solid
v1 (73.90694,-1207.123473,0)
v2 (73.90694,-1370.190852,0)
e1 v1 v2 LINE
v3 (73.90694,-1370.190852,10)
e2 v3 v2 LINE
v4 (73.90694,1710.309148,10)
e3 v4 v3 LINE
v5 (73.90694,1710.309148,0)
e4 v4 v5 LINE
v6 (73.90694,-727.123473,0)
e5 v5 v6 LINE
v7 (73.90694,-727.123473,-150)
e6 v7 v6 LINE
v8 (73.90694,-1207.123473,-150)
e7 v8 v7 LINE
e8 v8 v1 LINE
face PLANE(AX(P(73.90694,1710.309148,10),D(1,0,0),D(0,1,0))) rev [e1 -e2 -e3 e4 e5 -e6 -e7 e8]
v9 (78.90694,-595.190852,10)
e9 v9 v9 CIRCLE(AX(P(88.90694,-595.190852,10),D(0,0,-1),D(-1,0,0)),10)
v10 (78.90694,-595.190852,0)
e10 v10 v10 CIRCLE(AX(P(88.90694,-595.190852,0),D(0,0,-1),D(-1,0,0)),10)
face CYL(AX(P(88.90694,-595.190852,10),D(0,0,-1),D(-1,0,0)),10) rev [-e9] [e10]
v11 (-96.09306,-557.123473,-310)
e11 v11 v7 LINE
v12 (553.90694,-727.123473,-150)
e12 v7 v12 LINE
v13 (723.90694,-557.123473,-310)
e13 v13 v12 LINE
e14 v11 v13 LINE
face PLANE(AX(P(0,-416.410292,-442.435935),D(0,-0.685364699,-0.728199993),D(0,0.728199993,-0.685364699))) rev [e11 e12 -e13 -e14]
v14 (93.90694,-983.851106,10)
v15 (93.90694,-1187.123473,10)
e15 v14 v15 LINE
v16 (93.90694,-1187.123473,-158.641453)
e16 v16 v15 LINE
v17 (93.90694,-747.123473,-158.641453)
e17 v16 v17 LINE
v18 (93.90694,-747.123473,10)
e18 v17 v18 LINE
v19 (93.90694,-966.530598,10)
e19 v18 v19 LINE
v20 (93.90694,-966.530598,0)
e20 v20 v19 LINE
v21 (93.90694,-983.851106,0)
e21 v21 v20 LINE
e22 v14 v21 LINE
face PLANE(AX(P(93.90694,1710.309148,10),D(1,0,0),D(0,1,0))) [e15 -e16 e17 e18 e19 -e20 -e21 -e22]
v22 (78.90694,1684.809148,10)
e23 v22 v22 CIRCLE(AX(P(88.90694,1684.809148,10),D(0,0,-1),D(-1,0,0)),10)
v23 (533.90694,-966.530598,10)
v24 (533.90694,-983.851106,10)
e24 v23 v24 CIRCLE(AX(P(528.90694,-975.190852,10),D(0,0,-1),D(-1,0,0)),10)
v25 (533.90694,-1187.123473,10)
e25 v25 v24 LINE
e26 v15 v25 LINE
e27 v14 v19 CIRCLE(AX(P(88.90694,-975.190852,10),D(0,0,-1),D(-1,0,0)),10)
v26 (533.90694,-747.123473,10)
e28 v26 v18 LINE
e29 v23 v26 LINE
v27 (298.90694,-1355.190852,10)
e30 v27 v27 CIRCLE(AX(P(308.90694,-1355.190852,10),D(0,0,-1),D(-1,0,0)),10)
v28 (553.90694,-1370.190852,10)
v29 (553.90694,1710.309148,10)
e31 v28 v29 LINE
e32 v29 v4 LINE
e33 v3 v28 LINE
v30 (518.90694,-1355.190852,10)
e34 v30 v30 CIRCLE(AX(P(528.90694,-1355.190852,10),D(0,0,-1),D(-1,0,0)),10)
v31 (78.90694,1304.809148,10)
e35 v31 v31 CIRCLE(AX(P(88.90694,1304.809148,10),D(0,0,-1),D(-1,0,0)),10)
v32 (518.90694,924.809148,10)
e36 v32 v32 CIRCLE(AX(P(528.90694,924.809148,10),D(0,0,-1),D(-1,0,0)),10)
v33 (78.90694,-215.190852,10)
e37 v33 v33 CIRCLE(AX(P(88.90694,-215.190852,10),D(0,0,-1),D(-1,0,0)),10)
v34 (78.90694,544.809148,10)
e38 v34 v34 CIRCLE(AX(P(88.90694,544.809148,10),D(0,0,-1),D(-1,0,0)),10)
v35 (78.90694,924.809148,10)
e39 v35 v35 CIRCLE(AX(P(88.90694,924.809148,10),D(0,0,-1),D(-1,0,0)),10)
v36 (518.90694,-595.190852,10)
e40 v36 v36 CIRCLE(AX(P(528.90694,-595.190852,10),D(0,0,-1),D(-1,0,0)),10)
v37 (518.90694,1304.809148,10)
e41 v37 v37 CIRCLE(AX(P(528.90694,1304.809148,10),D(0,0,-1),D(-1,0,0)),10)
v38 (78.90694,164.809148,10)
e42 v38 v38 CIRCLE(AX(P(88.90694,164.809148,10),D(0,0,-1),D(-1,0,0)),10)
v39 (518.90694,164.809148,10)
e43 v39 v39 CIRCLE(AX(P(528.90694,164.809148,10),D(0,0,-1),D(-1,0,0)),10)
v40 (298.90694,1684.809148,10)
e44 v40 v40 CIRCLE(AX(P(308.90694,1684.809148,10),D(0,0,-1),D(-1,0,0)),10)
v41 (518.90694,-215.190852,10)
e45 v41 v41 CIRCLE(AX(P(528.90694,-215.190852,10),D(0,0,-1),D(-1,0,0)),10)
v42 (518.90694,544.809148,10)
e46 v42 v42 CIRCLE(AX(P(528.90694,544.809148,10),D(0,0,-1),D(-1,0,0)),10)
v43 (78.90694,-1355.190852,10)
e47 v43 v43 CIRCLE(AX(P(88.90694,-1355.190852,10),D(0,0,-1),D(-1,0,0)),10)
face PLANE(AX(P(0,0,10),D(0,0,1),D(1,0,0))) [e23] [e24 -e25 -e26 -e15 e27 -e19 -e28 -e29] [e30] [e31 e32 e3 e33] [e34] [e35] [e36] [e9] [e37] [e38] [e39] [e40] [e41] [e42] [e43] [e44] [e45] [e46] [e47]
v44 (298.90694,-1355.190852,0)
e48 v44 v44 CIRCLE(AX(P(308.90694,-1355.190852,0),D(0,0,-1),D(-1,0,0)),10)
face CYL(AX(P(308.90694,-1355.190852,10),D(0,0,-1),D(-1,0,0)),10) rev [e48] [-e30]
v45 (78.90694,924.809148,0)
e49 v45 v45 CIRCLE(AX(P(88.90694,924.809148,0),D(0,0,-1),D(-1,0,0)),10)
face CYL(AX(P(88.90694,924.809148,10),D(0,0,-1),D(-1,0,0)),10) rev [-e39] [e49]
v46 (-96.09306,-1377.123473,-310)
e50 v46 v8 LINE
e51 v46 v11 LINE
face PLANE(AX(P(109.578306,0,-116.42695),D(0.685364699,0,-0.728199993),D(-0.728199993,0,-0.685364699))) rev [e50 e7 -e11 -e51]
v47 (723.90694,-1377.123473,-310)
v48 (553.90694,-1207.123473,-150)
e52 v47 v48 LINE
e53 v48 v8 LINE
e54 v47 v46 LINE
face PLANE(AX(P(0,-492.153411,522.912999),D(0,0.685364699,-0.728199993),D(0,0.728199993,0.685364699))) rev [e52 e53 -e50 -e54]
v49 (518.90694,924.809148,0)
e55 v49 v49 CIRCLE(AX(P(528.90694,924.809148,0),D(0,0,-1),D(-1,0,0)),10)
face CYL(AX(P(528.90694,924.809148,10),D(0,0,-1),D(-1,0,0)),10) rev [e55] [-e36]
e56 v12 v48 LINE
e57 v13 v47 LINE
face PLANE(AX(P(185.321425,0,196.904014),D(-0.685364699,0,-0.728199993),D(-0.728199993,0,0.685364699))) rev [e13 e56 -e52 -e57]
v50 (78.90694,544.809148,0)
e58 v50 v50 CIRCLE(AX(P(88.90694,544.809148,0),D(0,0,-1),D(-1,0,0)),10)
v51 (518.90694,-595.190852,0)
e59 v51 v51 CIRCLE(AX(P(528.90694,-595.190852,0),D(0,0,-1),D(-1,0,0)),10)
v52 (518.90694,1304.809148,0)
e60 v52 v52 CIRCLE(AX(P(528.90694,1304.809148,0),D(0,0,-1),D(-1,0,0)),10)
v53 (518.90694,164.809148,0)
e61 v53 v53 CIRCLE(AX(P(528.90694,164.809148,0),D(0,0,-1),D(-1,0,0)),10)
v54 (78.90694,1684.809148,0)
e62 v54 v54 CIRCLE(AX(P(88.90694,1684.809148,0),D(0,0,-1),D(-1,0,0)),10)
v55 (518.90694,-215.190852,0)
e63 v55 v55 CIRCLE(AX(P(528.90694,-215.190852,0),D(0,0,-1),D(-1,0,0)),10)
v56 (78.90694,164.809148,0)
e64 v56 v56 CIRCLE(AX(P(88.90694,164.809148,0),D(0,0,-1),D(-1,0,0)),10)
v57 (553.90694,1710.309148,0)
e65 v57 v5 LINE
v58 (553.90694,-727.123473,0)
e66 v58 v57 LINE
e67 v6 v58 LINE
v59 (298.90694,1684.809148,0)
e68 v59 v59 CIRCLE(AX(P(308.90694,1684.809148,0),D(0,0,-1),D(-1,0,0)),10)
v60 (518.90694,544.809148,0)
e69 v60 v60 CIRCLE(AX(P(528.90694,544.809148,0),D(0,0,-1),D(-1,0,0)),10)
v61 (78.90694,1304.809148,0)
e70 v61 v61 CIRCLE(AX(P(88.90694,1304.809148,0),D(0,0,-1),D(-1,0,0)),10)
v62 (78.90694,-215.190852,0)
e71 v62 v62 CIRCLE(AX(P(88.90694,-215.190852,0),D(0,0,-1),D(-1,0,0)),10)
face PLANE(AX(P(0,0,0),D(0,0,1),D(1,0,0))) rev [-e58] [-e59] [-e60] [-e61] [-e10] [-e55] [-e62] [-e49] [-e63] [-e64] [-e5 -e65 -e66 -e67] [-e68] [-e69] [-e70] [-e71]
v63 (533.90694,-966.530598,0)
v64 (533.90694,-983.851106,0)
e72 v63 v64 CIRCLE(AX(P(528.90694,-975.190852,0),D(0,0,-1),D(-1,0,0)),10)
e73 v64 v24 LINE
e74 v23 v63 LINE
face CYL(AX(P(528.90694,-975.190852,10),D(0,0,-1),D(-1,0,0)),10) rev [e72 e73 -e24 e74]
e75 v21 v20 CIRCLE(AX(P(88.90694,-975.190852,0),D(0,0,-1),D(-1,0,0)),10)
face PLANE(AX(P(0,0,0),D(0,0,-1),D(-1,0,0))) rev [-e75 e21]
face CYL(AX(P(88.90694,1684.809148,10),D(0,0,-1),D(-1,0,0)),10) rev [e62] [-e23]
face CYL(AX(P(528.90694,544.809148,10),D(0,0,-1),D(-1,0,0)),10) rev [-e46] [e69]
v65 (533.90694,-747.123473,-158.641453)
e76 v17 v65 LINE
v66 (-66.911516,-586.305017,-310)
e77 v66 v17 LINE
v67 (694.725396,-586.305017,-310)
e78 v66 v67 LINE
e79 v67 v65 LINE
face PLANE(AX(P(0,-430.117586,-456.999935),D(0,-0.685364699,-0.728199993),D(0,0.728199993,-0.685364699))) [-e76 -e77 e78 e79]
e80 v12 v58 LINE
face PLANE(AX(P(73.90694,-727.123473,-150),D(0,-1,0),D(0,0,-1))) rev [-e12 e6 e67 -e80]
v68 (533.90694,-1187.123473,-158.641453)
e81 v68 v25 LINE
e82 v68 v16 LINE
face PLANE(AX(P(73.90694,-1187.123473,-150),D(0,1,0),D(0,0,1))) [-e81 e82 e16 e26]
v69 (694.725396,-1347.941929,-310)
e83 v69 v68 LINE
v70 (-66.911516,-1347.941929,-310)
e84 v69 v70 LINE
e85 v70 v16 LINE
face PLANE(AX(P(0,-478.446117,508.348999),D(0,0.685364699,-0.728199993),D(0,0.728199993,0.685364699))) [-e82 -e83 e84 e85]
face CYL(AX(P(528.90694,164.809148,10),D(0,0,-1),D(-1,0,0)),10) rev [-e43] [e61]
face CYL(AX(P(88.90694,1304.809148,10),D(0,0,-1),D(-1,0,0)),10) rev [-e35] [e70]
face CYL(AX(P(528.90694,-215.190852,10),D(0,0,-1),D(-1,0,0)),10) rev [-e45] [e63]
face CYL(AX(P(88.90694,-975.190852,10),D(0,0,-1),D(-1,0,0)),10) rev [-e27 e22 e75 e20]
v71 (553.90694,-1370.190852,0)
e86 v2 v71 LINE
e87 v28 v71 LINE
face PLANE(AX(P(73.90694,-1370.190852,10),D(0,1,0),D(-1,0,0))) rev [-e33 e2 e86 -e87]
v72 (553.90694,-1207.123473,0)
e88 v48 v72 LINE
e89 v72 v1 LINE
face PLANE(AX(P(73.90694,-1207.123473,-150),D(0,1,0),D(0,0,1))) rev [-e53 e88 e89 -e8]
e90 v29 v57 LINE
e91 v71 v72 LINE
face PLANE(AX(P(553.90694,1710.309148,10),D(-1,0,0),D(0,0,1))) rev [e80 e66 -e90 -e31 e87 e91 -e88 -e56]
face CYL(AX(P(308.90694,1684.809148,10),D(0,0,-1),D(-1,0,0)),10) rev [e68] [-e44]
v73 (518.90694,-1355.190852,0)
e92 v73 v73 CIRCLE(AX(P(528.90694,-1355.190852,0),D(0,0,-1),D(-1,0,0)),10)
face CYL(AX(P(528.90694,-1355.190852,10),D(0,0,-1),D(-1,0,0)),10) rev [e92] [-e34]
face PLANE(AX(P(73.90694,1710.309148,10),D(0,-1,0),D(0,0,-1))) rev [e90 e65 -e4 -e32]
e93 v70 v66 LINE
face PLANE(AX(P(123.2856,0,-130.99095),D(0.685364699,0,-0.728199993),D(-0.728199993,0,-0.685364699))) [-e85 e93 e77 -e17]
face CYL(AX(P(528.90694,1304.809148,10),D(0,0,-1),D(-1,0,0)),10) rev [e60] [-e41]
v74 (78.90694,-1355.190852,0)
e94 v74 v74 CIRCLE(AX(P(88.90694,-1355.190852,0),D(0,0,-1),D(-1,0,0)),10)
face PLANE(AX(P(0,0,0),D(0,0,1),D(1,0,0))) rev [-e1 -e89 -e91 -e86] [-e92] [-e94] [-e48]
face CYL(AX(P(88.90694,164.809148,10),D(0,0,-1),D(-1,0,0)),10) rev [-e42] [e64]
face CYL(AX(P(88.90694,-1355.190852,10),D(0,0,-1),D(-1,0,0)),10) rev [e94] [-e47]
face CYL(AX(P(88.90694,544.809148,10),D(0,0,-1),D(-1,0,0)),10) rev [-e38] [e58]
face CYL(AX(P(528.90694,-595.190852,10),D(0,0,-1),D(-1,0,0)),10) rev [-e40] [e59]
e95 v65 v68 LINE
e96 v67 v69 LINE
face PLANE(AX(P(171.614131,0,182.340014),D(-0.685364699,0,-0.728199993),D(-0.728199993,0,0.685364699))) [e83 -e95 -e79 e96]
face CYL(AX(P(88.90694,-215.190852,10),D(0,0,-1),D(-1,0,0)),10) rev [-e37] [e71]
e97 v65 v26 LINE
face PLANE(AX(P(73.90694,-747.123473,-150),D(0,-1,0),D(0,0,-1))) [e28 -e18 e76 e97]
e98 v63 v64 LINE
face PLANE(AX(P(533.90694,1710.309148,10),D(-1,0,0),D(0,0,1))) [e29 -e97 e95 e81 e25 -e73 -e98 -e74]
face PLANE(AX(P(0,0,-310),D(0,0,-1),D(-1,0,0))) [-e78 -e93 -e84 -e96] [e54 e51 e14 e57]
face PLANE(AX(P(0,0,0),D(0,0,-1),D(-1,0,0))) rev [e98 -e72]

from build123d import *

# Parameters (mm, degrees)
SKETCH1_W           = 480
SKETCH1_H           = 3080.5
BOSS_EXTRUDE1_DEPTH = 10
SKETCH2_R           = 10
CUT_EXTRUDE1_DEPTH  = 1798.795950849
SKETCH3_W           = 480
SKETCH3_H           = 480
BOSS_EXTRUDE2_DEPTH = 150
SHELL3_START        = -310
SHELL3_DEPTH        = 300
SHELL3_2_DEPTH      = 290
SKETCH7_W           = 440
SKETCH7_H           = 440
CUT_EXTRUDE6_DEPTH  = 1885.56855559


with BuildPart() as part:
    # Sketch1 → Boss-Extrude1 (new body)
    with BuildSketch(Plane.XY):
        with Locations((313.906940063, 170.059148265)):
            Rectangle(SKETCH1_W, SKETCH1_H)
    extrude(amount=BOSS_EXTRUDE1_DEPTH)

    # Sketch2 → Cut-Extrude1 (cut, through all)
    with BuildSketch(Plane(origin=(0, 0, 0), x_dir=(-1, 0, 0), z_dir=(0, 0, -1))):
        with Locations((-88.906940063, 544.809148265)):
            Circle(SKETCH2_R)
        with Locations((-88.906940063, -1355.190851735)):
            Circle(SKETCH2_R)
        with Locations((-88.906940063, 1684.809148265)):
            Circle(SKETCH2_R)
        with Locations((-308.906940063, 1684.809148265)):
            Circle(SKETCH2_R)
        with Locations((-528.906940063, 1304.809148265)):
            Circle(SKETCH2_R)
        with Locations((-88.906940063, 1304.809148265)):
            Circle(SKETCH2_R)
        with Locations((-88.906940063, 924.809148265)):
            Circle(SKETCH2_R)
        with Locations((-528.906940063, 924.809148265)):
            Circle(SKETCH2_R)
        with Locations((-528.906940063, 544.809148265)):
            Circle(SKETCH2_R)
        with Locations((-88.906940063, 164.809148265)):
            Circle(SKETCH2_R)
        with Locations((-528.906940063, 164.809148265)):
            Circle(SKETCH2_R)
        with Locations((-88.906940063, -215.190851735)):
            Circle(SKETCH2_R)
        with Locations((-528.906940063, -215.190851735)):
            Circle(SKETCH2_R)
        with Locations((-88.906940063, -595.190851735)):
            Circle(SKETCH2_R)
        with Locations((-528.906940063, -595.190851735)):
            Circle(SKETCH2_R)
        with Locations((-528.906940063, -975.190851735)):
            Circle(SKETCH2_R)
        with Locations((-88.906940063, -975.190851735)):
            Circle(SKETCH2_R)
        with Locations((-308.906940063, -1355.190851735)):
            Circle(SKETCH2_R)
        with Locations((-528.906940063, -1355.190851735)):
            Circle(SKETCH2_R)
    extrude(amount=-CUT_EXTRUDE1_DEPTH, mode=Mode.SUBTRACT)

    # Sketch3 → Boss-Extrude2 (add)
    with BuildSketch(Plane(origin=(0, 0, 0), x_dir=(-1, 0, 0), z_dir=(0, 0, -1))):
        with Locations((-313.906940063, -967.123472678)):
            Rectangle(SKETCH3_W, SKETCH3_H)
    extrude(amount=BOSS_EXTRUDE2_DEPTH)

    # Sketch5 → Loft1 section 0
    with BuildSketch(Plane(origin=(0, 0, -310), x_dir=(-1, 0, 0), z_dir=(0, 0, -1))):
        with BuildLine():
            Line((-723.906940063, -1377.123472678), (96.093059937, -1377.123472678))
            Line((96.093059937, -1377.123472678), (96.093059937, -557.123472678))
            Line((96.093059937, -557.123472678), (-723.906940063, -557.123472678))
            Line((-723.906940063, -557.123472678), (-723.906940063, -1377.123472678))
        make_face()
    # Sketch4 → Loft1 section 1
    with BuildSketch(Plane(origin=(0, 0, -150), x_dir=(-1, 0, 0), z_dir=(0, 0, -1))):
        with BuildLine():
            Line((-553.906940063, -1207.123472678), (-73.906940063, -1207.123472678))
            Line((-73.906940063, -1207.123472678), (-73.906940063, -727.123472678))
            Line((-73.906940063, -727.123472678), (-553.906940063, -727.123472678))
            Line((-553.906940063, -727.123472678), (-553.906940063, -1207.123472678))
        make_face()
    loft()

    # Shell3: read off the stored shape, not the designer's step
    # Shell3 outline → Shell3 (cut)
    with BuildSketch(Plane.XY.offset(SHELL3_START)):
        with BuildLine():
            Line((93.906940063, -1004.771250651), (93.906940063, -1187.123472678))
            Line((93.906940063, -1187.123472678), (533.906940063, -1187.123472678))
            Line((533.906940063, -1187.123472678), (533.906940063, -1004.771250651))
            ThreePointArc((533.906940063, -1004.771250651), (498.906940063, -975.190851736), (533.906940063, -945.61045282))
            Line((533.906940063, -945.61045282), (533.906940063, -747.123472678))
            Line((533.906940063, -747.123472678), (93.906940063, -747.123472678))
            Line((93.906940063, -747.123472678), (93.906940063, -945.61045282))
            ThreePointArc((93.906940063, -945.61045282), (118.906940063, -975.190851736), (93.906940063, -1004.771250651))
        make_face()
    extrude(amount=SHELL3_DEPTH, mode=Mode.SUBTRACT)

    # Shell3 2 outline → Shell3 2 (cut)
    with BuildSketch(Plane.XY.offset(SHELL3_START)):
        with BuildLine():
            Line((93.906940063, -945.61045282), (93.906940063, -1004.771250651))
            ThreePointArc((93.906940063, -1004.771250651), (118.906940063, -975.190851736), (93.906940063, -945.61045282))
        make_face()
        with BuildLine():
            ThreePointArc((533.906940063, -945.61045282), (498.906940063, -975.190851736), (533.906940063, -1004.771250651))
            Line((533.906940063, -1004.771250651), (533.906940063, -945.61045282))
        make_face()
    extrude(amount=SHELL3_2_DEPTH, mode=Mode.SUBTRACT)

    # Shell3 3: loft between two sections, ruled curve by curve
    shell3_3_from = [
        Edge.make_line((533.906940063, -1187.123472678, -158.641453012), (93.906940063, -1187.123472678, -158.641453012)),
        Edge.make_line((93.906940063, -1187.123472678, -158.641453012), (93.906940063, -747.123472678, -158.641453012)),
        Edge.make_line((533.906940063, -747.123472678, -158.641453012), (533.906940063, -1187.123472678, -158.641453012)),
        Edge.make_line((93.906940063, -747.123472678, -158.641453012), (533.906940063, -747.123472678, -158.641453012)),
    ]
    shell3_3_to = [
        Edge.make_line((694.725396238, -1347.941928853, -310), (-66.911516112, -1347.941928853, -310)),
        Edge.make_line((-66.911516112, -1347.941928853, -310), (-66.911516112, -586.305016503, -310)),
        Edge.make_line((694.725396238, -586.305016503, -310), (694.725396238, -1347.941928853, -310)),
        Edge.make_line((-66.911516112, -586.305016503, -310), (694.725396238, -586.305016503, -310)),
    ]
    shell3_3 = Solid(Shell([*[Face.make_surface_from_curves(shell3_3_from[k], shell3_3_to[k]) for k in range(4)], Face(Wire(shell3_3_from)), Face(Wire(shell3_3_to))]))
    add(shell3_3, mode=Mode.SUBTRACT)

    # Sketch7 → Cut-Extrude6 (cut, through all)
    with BuildSketch(Plane.XY.offset(10)):
        with Locations((313.906940063, -967.123472678)):
            Rectangle(SKETCH7_W, SKETCH7_H)
    extrude(amount=-CUT_EXTRUDE6_DEPTH, mode=Mode.SUBTRACT)


solid = part.part
